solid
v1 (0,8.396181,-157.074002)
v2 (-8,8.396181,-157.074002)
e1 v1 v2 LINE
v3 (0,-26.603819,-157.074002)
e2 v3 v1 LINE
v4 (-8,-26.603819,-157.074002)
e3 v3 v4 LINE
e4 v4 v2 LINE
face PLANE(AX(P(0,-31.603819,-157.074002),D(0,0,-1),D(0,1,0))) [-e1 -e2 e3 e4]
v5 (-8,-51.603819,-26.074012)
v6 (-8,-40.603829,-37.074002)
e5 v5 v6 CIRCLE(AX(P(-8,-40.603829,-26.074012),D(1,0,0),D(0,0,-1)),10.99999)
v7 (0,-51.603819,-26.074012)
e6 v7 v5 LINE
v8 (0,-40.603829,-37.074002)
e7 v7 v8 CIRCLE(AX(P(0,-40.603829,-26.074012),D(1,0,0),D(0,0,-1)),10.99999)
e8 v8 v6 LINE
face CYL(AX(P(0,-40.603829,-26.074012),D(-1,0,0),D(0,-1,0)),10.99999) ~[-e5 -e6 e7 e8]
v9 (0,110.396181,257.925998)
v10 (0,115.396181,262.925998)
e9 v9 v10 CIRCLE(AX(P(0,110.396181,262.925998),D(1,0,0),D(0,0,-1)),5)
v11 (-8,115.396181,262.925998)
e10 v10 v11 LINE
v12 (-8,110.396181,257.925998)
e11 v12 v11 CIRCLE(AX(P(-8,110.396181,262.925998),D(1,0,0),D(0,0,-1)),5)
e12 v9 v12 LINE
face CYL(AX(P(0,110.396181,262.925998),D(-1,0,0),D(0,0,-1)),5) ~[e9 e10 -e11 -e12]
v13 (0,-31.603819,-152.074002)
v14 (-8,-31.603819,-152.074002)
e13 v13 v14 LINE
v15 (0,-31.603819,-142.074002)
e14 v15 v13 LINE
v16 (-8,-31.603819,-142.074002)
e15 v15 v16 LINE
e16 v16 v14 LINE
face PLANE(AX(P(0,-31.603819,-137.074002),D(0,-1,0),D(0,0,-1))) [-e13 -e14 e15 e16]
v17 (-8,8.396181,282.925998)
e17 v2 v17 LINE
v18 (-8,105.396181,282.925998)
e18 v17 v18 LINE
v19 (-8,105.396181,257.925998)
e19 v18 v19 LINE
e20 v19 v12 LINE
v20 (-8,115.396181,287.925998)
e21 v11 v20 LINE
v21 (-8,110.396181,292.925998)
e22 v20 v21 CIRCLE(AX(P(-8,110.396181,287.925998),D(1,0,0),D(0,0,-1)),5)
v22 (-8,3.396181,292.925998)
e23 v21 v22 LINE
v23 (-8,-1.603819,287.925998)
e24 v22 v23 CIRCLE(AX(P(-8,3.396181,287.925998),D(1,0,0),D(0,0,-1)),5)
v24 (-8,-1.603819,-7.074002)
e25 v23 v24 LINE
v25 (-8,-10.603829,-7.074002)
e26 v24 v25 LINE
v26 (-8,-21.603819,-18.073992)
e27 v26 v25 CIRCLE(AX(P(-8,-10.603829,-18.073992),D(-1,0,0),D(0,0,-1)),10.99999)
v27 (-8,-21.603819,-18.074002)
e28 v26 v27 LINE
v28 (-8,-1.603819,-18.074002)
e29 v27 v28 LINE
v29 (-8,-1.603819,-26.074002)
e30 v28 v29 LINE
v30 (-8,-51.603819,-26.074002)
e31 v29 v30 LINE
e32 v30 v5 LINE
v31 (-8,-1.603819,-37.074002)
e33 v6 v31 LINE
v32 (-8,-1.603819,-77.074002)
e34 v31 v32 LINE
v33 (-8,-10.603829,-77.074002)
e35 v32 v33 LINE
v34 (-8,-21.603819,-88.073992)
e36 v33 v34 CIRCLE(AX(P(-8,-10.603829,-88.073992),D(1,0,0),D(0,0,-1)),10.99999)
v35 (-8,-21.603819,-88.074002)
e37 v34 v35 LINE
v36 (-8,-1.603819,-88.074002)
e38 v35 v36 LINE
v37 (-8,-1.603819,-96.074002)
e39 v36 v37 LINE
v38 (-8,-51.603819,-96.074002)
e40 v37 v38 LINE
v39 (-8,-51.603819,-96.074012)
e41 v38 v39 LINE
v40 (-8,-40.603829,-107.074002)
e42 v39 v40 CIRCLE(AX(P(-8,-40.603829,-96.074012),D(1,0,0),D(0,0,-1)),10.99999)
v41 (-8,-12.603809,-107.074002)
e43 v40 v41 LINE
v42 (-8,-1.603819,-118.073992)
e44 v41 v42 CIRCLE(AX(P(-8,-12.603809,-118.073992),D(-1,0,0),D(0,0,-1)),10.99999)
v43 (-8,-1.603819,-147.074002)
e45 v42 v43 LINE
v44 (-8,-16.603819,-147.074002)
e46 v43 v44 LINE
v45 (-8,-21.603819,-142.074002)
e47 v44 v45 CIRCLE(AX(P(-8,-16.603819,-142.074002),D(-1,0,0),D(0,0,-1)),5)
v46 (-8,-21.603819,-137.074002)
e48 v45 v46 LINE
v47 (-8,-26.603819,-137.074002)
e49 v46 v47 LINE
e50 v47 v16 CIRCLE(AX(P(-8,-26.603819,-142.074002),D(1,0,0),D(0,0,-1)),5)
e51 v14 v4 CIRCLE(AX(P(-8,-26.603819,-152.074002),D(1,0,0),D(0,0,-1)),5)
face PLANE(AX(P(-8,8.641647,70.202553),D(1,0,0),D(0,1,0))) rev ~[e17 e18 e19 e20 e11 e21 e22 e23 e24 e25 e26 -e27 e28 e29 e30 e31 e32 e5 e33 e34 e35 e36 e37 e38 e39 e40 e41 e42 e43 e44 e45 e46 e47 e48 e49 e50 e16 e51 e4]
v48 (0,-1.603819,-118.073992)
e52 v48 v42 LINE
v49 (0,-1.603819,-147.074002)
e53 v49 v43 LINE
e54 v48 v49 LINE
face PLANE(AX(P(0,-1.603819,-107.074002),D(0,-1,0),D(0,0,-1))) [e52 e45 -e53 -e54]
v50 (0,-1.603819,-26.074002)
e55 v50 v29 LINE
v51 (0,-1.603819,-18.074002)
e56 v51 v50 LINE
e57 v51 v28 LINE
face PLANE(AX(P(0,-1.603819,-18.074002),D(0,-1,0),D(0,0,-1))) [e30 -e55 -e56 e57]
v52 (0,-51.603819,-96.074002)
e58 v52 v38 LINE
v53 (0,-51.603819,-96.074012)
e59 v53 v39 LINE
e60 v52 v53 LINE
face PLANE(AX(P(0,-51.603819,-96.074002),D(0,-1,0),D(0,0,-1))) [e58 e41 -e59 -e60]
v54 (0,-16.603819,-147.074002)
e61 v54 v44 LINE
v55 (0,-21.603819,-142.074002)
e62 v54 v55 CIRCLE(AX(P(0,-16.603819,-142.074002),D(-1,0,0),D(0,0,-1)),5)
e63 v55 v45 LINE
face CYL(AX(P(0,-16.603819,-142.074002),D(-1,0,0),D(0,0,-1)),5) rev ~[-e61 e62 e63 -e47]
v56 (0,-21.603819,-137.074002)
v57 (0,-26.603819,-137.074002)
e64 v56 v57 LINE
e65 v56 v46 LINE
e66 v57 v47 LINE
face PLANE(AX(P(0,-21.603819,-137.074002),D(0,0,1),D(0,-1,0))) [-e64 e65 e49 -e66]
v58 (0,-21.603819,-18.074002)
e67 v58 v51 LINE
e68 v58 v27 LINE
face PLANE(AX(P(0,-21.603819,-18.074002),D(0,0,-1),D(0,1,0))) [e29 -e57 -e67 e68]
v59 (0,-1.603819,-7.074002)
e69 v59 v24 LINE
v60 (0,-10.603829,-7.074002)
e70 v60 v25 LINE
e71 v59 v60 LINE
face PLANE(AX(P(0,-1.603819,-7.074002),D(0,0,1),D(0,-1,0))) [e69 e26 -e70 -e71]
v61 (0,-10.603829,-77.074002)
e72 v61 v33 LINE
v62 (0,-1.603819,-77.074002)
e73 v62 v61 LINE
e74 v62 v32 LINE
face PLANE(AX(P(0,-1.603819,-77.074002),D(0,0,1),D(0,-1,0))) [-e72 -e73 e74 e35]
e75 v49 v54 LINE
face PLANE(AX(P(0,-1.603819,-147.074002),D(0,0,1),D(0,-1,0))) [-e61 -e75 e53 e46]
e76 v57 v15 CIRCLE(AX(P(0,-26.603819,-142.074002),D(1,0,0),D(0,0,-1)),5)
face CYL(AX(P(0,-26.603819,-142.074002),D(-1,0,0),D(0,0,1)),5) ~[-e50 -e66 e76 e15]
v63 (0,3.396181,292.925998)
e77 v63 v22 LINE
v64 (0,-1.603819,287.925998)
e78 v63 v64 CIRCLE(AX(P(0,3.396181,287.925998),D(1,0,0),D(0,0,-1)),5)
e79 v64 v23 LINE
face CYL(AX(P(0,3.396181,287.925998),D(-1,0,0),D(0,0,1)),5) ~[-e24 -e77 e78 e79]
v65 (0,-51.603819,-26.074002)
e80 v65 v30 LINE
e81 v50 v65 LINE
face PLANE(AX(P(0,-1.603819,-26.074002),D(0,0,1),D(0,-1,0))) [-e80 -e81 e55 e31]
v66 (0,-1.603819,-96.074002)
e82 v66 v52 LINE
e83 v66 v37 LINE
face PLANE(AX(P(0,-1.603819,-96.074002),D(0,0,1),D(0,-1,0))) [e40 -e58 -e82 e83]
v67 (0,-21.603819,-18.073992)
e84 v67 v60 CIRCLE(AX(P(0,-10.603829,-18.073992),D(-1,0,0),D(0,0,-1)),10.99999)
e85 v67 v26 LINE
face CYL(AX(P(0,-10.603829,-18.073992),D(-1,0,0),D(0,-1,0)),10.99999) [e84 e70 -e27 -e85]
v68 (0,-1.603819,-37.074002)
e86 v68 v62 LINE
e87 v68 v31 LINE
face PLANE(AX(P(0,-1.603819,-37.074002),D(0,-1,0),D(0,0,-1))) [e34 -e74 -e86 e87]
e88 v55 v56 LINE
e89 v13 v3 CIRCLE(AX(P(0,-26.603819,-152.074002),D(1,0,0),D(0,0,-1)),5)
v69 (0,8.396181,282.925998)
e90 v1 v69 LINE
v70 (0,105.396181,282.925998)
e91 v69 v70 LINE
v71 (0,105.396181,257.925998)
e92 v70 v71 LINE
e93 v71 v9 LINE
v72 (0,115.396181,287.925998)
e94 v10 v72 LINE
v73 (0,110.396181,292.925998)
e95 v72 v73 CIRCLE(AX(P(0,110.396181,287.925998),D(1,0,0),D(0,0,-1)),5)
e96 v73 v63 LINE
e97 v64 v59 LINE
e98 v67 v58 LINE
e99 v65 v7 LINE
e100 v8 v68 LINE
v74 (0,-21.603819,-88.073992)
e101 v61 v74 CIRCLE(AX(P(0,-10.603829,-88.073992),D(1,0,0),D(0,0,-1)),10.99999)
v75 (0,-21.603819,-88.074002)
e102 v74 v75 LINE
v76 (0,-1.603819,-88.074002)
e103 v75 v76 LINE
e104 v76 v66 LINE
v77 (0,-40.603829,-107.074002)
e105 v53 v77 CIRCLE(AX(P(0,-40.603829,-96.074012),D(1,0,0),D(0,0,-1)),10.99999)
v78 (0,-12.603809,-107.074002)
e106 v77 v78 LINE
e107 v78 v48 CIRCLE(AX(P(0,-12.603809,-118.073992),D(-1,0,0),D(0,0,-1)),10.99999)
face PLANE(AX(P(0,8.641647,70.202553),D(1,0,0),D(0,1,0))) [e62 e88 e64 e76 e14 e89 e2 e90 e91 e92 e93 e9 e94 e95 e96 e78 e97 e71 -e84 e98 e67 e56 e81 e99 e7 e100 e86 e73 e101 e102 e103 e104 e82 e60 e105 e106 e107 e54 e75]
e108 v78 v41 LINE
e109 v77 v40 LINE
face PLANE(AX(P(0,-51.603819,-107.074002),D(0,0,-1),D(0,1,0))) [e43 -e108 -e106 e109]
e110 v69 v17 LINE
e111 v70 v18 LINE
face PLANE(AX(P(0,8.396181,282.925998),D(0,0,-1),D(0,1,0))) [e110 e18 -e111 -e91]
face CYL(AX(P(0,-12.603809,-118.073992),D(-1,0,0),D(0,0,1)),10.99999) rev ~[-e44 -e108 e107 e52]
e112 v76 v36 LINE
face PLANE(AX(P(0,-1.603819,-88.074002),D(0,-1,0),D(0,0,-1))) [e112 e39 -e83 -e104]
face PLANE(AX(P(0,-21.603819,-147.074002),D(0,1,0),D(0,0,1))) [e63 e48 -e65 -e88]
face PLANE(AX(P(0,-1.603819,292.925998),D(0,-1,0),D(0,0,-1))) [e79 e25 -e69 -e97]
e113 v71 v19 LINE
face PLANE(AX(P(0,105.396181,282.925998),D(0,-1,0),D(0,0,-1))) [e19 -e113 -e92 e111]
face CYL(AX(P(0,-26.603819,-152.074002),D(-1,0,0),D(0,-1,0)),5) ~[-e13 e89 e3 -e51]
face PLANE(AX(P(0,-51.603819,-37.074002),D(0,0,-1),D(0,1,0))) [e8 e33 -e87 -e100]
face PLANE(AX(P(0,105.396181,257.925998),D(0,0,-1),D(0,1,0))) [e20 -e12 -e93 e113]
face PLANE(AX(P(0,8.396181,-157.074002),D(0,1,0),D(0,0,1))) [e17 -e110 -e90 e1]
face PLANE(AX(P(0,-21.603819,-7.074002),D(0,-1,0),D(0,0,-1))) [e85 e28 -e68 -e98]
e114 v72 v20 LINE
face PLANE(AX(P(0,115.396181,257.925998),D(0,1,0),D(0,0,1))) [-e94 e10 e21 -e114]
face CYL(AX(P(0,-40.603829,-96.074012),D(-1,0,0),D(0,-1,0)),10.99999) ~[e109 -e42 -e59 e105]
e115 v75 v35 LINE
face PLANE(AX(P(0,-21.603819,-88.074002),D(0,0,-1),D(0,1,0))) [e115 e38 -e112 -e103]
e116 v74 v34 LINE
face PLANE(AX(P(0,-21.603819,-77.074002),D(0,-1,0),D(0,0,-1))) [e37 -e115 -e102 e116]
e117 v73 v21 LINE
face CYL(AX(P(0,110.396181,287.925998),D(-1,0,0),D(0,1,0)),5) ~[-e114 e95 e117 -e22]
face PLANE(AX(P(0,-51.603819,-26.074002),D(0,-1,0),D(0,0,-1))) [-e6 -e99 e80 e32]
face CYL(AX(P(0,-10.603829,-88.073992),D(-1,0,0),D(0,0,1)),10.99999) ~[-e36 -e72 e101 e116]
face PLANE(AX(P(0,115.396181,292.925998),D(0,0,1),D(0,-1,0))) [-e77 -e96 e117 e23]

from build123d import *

# Parameters (mm, degrees)
F1_DEPTH = 8
F2_R     = 10.99999
F3_R     = 10.99999
F4_R     = 10.99999
F5_R     = 10.99999
F6_R     = 5
F7_R     = 5


# Not quite as in the source:
# - a fillet or chamfer is up to 0.001 mm smaller than in the source, because OpenCascade refuses the exact size


with BuildPart() as f1:
    # F0 (on Right) → F1 (new body)
    with BuildSketch(Plane.YZ):
        Polygon((115.3961805266, 292.9259983301), (-1.6038194734, 292.9259983301), (-1.6038194734, -7.0740016699), (-21.6038194734, -7.0740016699), (-21.6038194734, -18.0740016699), (-1.6038194734, -18.0740016699), (-1.6038194734, -26.0740016699), (-51.6038194734, -26.0740016699), (-51.6038194734, -37.0740016699), (-1.6038194734, -37.0740016699), (-1.6038194734, -77.0740016699), (-21.6038194734, -77.0740016699), (-21.6038194734, -88.0740016699), (-1.6038194734, -88.0740016699), (-1.6038194734, -96.0740016699), (-51.6038194734, -96.0740016699), (-51.6038194734, -107.0740016699), (-1.6038194734, -107.0740016699), (-1.6038194734, -147.0740016699), (-21.6038194734, -147.0740016699), (-21.6038194734, -137.0740016699), (-31.6038194734, -137.0740016699), (-31.6038194734, -157.0740016699), (8.3961805266, -157.0740016699), (8.3961805266, 282.9259983301), (105.3961805266, 282.9259983301), (105.3961805266, 257.9259983301), (115.3961805266, 257.9259983301), align=None)
    extrude(amount=-F1_DEPTH)

    # F2 (radius 11 in the source; OpenCascade refuses exactly that, so slightly less here)
    f2_edges = [f1.edges().sort_by_distance(p)[0] for p in [
        (-4, -51.603819, -37.074002),
    ]]
    fillet(f2_edges, radius=F2_R)

    # F3 (radius 11 in the source; OpenCascade refuses exactly that, so slightly less here)
    f3_edges = [f1.edges().sort_by_distance(p)[0] for p in [
        (-4, -21.603819, -7.074002),
    ]]
    fillet(f3_edges, radius=F3_R)

    # F4 (radius 11 in the source; OpenCascade refuses exactly that, so slightly less here)
    f4_edges = [f1.edges().sort_by_distance(p)[0] for p in [
        (-4, -21.603819, -77.074002),
    ]]
    fillet(f4_edges, radius=F4_R)

    # F5 (radius 11 in the source; OpenCascade refuses exactly that, so slightly less here)
    f5_edges = [f1.edges().sort_by_distance(p)[0] for p in [
        (-4, -51.603819, -107.074002),
        (-4, -1.603819, -107.074002),
    ]]
    fillet(f5_edges, radius=F5_R)

    # F6
    f6_edges = [f1.edges().sort_by_distance(p)[0] for p in [
        (-4, -31.603819, -137.074002),
        (-4, -31.603819, -157.074002),
        (-4, -21.603819, -147.074002),
    ]]
    fillet(f6_edges, radius=F6_R)

    # F7
    f7_edges = [f1.edges().sort_by_distance(p)[0] for p in [
        (-4, -1.603819, 292.925998),
        (-4, 115.396181, 292.925998),
        (-4, 115.396181, 257.925998),
    ]]
    fillet(f7_edges, radius=F7_R)


solid = f1.part
